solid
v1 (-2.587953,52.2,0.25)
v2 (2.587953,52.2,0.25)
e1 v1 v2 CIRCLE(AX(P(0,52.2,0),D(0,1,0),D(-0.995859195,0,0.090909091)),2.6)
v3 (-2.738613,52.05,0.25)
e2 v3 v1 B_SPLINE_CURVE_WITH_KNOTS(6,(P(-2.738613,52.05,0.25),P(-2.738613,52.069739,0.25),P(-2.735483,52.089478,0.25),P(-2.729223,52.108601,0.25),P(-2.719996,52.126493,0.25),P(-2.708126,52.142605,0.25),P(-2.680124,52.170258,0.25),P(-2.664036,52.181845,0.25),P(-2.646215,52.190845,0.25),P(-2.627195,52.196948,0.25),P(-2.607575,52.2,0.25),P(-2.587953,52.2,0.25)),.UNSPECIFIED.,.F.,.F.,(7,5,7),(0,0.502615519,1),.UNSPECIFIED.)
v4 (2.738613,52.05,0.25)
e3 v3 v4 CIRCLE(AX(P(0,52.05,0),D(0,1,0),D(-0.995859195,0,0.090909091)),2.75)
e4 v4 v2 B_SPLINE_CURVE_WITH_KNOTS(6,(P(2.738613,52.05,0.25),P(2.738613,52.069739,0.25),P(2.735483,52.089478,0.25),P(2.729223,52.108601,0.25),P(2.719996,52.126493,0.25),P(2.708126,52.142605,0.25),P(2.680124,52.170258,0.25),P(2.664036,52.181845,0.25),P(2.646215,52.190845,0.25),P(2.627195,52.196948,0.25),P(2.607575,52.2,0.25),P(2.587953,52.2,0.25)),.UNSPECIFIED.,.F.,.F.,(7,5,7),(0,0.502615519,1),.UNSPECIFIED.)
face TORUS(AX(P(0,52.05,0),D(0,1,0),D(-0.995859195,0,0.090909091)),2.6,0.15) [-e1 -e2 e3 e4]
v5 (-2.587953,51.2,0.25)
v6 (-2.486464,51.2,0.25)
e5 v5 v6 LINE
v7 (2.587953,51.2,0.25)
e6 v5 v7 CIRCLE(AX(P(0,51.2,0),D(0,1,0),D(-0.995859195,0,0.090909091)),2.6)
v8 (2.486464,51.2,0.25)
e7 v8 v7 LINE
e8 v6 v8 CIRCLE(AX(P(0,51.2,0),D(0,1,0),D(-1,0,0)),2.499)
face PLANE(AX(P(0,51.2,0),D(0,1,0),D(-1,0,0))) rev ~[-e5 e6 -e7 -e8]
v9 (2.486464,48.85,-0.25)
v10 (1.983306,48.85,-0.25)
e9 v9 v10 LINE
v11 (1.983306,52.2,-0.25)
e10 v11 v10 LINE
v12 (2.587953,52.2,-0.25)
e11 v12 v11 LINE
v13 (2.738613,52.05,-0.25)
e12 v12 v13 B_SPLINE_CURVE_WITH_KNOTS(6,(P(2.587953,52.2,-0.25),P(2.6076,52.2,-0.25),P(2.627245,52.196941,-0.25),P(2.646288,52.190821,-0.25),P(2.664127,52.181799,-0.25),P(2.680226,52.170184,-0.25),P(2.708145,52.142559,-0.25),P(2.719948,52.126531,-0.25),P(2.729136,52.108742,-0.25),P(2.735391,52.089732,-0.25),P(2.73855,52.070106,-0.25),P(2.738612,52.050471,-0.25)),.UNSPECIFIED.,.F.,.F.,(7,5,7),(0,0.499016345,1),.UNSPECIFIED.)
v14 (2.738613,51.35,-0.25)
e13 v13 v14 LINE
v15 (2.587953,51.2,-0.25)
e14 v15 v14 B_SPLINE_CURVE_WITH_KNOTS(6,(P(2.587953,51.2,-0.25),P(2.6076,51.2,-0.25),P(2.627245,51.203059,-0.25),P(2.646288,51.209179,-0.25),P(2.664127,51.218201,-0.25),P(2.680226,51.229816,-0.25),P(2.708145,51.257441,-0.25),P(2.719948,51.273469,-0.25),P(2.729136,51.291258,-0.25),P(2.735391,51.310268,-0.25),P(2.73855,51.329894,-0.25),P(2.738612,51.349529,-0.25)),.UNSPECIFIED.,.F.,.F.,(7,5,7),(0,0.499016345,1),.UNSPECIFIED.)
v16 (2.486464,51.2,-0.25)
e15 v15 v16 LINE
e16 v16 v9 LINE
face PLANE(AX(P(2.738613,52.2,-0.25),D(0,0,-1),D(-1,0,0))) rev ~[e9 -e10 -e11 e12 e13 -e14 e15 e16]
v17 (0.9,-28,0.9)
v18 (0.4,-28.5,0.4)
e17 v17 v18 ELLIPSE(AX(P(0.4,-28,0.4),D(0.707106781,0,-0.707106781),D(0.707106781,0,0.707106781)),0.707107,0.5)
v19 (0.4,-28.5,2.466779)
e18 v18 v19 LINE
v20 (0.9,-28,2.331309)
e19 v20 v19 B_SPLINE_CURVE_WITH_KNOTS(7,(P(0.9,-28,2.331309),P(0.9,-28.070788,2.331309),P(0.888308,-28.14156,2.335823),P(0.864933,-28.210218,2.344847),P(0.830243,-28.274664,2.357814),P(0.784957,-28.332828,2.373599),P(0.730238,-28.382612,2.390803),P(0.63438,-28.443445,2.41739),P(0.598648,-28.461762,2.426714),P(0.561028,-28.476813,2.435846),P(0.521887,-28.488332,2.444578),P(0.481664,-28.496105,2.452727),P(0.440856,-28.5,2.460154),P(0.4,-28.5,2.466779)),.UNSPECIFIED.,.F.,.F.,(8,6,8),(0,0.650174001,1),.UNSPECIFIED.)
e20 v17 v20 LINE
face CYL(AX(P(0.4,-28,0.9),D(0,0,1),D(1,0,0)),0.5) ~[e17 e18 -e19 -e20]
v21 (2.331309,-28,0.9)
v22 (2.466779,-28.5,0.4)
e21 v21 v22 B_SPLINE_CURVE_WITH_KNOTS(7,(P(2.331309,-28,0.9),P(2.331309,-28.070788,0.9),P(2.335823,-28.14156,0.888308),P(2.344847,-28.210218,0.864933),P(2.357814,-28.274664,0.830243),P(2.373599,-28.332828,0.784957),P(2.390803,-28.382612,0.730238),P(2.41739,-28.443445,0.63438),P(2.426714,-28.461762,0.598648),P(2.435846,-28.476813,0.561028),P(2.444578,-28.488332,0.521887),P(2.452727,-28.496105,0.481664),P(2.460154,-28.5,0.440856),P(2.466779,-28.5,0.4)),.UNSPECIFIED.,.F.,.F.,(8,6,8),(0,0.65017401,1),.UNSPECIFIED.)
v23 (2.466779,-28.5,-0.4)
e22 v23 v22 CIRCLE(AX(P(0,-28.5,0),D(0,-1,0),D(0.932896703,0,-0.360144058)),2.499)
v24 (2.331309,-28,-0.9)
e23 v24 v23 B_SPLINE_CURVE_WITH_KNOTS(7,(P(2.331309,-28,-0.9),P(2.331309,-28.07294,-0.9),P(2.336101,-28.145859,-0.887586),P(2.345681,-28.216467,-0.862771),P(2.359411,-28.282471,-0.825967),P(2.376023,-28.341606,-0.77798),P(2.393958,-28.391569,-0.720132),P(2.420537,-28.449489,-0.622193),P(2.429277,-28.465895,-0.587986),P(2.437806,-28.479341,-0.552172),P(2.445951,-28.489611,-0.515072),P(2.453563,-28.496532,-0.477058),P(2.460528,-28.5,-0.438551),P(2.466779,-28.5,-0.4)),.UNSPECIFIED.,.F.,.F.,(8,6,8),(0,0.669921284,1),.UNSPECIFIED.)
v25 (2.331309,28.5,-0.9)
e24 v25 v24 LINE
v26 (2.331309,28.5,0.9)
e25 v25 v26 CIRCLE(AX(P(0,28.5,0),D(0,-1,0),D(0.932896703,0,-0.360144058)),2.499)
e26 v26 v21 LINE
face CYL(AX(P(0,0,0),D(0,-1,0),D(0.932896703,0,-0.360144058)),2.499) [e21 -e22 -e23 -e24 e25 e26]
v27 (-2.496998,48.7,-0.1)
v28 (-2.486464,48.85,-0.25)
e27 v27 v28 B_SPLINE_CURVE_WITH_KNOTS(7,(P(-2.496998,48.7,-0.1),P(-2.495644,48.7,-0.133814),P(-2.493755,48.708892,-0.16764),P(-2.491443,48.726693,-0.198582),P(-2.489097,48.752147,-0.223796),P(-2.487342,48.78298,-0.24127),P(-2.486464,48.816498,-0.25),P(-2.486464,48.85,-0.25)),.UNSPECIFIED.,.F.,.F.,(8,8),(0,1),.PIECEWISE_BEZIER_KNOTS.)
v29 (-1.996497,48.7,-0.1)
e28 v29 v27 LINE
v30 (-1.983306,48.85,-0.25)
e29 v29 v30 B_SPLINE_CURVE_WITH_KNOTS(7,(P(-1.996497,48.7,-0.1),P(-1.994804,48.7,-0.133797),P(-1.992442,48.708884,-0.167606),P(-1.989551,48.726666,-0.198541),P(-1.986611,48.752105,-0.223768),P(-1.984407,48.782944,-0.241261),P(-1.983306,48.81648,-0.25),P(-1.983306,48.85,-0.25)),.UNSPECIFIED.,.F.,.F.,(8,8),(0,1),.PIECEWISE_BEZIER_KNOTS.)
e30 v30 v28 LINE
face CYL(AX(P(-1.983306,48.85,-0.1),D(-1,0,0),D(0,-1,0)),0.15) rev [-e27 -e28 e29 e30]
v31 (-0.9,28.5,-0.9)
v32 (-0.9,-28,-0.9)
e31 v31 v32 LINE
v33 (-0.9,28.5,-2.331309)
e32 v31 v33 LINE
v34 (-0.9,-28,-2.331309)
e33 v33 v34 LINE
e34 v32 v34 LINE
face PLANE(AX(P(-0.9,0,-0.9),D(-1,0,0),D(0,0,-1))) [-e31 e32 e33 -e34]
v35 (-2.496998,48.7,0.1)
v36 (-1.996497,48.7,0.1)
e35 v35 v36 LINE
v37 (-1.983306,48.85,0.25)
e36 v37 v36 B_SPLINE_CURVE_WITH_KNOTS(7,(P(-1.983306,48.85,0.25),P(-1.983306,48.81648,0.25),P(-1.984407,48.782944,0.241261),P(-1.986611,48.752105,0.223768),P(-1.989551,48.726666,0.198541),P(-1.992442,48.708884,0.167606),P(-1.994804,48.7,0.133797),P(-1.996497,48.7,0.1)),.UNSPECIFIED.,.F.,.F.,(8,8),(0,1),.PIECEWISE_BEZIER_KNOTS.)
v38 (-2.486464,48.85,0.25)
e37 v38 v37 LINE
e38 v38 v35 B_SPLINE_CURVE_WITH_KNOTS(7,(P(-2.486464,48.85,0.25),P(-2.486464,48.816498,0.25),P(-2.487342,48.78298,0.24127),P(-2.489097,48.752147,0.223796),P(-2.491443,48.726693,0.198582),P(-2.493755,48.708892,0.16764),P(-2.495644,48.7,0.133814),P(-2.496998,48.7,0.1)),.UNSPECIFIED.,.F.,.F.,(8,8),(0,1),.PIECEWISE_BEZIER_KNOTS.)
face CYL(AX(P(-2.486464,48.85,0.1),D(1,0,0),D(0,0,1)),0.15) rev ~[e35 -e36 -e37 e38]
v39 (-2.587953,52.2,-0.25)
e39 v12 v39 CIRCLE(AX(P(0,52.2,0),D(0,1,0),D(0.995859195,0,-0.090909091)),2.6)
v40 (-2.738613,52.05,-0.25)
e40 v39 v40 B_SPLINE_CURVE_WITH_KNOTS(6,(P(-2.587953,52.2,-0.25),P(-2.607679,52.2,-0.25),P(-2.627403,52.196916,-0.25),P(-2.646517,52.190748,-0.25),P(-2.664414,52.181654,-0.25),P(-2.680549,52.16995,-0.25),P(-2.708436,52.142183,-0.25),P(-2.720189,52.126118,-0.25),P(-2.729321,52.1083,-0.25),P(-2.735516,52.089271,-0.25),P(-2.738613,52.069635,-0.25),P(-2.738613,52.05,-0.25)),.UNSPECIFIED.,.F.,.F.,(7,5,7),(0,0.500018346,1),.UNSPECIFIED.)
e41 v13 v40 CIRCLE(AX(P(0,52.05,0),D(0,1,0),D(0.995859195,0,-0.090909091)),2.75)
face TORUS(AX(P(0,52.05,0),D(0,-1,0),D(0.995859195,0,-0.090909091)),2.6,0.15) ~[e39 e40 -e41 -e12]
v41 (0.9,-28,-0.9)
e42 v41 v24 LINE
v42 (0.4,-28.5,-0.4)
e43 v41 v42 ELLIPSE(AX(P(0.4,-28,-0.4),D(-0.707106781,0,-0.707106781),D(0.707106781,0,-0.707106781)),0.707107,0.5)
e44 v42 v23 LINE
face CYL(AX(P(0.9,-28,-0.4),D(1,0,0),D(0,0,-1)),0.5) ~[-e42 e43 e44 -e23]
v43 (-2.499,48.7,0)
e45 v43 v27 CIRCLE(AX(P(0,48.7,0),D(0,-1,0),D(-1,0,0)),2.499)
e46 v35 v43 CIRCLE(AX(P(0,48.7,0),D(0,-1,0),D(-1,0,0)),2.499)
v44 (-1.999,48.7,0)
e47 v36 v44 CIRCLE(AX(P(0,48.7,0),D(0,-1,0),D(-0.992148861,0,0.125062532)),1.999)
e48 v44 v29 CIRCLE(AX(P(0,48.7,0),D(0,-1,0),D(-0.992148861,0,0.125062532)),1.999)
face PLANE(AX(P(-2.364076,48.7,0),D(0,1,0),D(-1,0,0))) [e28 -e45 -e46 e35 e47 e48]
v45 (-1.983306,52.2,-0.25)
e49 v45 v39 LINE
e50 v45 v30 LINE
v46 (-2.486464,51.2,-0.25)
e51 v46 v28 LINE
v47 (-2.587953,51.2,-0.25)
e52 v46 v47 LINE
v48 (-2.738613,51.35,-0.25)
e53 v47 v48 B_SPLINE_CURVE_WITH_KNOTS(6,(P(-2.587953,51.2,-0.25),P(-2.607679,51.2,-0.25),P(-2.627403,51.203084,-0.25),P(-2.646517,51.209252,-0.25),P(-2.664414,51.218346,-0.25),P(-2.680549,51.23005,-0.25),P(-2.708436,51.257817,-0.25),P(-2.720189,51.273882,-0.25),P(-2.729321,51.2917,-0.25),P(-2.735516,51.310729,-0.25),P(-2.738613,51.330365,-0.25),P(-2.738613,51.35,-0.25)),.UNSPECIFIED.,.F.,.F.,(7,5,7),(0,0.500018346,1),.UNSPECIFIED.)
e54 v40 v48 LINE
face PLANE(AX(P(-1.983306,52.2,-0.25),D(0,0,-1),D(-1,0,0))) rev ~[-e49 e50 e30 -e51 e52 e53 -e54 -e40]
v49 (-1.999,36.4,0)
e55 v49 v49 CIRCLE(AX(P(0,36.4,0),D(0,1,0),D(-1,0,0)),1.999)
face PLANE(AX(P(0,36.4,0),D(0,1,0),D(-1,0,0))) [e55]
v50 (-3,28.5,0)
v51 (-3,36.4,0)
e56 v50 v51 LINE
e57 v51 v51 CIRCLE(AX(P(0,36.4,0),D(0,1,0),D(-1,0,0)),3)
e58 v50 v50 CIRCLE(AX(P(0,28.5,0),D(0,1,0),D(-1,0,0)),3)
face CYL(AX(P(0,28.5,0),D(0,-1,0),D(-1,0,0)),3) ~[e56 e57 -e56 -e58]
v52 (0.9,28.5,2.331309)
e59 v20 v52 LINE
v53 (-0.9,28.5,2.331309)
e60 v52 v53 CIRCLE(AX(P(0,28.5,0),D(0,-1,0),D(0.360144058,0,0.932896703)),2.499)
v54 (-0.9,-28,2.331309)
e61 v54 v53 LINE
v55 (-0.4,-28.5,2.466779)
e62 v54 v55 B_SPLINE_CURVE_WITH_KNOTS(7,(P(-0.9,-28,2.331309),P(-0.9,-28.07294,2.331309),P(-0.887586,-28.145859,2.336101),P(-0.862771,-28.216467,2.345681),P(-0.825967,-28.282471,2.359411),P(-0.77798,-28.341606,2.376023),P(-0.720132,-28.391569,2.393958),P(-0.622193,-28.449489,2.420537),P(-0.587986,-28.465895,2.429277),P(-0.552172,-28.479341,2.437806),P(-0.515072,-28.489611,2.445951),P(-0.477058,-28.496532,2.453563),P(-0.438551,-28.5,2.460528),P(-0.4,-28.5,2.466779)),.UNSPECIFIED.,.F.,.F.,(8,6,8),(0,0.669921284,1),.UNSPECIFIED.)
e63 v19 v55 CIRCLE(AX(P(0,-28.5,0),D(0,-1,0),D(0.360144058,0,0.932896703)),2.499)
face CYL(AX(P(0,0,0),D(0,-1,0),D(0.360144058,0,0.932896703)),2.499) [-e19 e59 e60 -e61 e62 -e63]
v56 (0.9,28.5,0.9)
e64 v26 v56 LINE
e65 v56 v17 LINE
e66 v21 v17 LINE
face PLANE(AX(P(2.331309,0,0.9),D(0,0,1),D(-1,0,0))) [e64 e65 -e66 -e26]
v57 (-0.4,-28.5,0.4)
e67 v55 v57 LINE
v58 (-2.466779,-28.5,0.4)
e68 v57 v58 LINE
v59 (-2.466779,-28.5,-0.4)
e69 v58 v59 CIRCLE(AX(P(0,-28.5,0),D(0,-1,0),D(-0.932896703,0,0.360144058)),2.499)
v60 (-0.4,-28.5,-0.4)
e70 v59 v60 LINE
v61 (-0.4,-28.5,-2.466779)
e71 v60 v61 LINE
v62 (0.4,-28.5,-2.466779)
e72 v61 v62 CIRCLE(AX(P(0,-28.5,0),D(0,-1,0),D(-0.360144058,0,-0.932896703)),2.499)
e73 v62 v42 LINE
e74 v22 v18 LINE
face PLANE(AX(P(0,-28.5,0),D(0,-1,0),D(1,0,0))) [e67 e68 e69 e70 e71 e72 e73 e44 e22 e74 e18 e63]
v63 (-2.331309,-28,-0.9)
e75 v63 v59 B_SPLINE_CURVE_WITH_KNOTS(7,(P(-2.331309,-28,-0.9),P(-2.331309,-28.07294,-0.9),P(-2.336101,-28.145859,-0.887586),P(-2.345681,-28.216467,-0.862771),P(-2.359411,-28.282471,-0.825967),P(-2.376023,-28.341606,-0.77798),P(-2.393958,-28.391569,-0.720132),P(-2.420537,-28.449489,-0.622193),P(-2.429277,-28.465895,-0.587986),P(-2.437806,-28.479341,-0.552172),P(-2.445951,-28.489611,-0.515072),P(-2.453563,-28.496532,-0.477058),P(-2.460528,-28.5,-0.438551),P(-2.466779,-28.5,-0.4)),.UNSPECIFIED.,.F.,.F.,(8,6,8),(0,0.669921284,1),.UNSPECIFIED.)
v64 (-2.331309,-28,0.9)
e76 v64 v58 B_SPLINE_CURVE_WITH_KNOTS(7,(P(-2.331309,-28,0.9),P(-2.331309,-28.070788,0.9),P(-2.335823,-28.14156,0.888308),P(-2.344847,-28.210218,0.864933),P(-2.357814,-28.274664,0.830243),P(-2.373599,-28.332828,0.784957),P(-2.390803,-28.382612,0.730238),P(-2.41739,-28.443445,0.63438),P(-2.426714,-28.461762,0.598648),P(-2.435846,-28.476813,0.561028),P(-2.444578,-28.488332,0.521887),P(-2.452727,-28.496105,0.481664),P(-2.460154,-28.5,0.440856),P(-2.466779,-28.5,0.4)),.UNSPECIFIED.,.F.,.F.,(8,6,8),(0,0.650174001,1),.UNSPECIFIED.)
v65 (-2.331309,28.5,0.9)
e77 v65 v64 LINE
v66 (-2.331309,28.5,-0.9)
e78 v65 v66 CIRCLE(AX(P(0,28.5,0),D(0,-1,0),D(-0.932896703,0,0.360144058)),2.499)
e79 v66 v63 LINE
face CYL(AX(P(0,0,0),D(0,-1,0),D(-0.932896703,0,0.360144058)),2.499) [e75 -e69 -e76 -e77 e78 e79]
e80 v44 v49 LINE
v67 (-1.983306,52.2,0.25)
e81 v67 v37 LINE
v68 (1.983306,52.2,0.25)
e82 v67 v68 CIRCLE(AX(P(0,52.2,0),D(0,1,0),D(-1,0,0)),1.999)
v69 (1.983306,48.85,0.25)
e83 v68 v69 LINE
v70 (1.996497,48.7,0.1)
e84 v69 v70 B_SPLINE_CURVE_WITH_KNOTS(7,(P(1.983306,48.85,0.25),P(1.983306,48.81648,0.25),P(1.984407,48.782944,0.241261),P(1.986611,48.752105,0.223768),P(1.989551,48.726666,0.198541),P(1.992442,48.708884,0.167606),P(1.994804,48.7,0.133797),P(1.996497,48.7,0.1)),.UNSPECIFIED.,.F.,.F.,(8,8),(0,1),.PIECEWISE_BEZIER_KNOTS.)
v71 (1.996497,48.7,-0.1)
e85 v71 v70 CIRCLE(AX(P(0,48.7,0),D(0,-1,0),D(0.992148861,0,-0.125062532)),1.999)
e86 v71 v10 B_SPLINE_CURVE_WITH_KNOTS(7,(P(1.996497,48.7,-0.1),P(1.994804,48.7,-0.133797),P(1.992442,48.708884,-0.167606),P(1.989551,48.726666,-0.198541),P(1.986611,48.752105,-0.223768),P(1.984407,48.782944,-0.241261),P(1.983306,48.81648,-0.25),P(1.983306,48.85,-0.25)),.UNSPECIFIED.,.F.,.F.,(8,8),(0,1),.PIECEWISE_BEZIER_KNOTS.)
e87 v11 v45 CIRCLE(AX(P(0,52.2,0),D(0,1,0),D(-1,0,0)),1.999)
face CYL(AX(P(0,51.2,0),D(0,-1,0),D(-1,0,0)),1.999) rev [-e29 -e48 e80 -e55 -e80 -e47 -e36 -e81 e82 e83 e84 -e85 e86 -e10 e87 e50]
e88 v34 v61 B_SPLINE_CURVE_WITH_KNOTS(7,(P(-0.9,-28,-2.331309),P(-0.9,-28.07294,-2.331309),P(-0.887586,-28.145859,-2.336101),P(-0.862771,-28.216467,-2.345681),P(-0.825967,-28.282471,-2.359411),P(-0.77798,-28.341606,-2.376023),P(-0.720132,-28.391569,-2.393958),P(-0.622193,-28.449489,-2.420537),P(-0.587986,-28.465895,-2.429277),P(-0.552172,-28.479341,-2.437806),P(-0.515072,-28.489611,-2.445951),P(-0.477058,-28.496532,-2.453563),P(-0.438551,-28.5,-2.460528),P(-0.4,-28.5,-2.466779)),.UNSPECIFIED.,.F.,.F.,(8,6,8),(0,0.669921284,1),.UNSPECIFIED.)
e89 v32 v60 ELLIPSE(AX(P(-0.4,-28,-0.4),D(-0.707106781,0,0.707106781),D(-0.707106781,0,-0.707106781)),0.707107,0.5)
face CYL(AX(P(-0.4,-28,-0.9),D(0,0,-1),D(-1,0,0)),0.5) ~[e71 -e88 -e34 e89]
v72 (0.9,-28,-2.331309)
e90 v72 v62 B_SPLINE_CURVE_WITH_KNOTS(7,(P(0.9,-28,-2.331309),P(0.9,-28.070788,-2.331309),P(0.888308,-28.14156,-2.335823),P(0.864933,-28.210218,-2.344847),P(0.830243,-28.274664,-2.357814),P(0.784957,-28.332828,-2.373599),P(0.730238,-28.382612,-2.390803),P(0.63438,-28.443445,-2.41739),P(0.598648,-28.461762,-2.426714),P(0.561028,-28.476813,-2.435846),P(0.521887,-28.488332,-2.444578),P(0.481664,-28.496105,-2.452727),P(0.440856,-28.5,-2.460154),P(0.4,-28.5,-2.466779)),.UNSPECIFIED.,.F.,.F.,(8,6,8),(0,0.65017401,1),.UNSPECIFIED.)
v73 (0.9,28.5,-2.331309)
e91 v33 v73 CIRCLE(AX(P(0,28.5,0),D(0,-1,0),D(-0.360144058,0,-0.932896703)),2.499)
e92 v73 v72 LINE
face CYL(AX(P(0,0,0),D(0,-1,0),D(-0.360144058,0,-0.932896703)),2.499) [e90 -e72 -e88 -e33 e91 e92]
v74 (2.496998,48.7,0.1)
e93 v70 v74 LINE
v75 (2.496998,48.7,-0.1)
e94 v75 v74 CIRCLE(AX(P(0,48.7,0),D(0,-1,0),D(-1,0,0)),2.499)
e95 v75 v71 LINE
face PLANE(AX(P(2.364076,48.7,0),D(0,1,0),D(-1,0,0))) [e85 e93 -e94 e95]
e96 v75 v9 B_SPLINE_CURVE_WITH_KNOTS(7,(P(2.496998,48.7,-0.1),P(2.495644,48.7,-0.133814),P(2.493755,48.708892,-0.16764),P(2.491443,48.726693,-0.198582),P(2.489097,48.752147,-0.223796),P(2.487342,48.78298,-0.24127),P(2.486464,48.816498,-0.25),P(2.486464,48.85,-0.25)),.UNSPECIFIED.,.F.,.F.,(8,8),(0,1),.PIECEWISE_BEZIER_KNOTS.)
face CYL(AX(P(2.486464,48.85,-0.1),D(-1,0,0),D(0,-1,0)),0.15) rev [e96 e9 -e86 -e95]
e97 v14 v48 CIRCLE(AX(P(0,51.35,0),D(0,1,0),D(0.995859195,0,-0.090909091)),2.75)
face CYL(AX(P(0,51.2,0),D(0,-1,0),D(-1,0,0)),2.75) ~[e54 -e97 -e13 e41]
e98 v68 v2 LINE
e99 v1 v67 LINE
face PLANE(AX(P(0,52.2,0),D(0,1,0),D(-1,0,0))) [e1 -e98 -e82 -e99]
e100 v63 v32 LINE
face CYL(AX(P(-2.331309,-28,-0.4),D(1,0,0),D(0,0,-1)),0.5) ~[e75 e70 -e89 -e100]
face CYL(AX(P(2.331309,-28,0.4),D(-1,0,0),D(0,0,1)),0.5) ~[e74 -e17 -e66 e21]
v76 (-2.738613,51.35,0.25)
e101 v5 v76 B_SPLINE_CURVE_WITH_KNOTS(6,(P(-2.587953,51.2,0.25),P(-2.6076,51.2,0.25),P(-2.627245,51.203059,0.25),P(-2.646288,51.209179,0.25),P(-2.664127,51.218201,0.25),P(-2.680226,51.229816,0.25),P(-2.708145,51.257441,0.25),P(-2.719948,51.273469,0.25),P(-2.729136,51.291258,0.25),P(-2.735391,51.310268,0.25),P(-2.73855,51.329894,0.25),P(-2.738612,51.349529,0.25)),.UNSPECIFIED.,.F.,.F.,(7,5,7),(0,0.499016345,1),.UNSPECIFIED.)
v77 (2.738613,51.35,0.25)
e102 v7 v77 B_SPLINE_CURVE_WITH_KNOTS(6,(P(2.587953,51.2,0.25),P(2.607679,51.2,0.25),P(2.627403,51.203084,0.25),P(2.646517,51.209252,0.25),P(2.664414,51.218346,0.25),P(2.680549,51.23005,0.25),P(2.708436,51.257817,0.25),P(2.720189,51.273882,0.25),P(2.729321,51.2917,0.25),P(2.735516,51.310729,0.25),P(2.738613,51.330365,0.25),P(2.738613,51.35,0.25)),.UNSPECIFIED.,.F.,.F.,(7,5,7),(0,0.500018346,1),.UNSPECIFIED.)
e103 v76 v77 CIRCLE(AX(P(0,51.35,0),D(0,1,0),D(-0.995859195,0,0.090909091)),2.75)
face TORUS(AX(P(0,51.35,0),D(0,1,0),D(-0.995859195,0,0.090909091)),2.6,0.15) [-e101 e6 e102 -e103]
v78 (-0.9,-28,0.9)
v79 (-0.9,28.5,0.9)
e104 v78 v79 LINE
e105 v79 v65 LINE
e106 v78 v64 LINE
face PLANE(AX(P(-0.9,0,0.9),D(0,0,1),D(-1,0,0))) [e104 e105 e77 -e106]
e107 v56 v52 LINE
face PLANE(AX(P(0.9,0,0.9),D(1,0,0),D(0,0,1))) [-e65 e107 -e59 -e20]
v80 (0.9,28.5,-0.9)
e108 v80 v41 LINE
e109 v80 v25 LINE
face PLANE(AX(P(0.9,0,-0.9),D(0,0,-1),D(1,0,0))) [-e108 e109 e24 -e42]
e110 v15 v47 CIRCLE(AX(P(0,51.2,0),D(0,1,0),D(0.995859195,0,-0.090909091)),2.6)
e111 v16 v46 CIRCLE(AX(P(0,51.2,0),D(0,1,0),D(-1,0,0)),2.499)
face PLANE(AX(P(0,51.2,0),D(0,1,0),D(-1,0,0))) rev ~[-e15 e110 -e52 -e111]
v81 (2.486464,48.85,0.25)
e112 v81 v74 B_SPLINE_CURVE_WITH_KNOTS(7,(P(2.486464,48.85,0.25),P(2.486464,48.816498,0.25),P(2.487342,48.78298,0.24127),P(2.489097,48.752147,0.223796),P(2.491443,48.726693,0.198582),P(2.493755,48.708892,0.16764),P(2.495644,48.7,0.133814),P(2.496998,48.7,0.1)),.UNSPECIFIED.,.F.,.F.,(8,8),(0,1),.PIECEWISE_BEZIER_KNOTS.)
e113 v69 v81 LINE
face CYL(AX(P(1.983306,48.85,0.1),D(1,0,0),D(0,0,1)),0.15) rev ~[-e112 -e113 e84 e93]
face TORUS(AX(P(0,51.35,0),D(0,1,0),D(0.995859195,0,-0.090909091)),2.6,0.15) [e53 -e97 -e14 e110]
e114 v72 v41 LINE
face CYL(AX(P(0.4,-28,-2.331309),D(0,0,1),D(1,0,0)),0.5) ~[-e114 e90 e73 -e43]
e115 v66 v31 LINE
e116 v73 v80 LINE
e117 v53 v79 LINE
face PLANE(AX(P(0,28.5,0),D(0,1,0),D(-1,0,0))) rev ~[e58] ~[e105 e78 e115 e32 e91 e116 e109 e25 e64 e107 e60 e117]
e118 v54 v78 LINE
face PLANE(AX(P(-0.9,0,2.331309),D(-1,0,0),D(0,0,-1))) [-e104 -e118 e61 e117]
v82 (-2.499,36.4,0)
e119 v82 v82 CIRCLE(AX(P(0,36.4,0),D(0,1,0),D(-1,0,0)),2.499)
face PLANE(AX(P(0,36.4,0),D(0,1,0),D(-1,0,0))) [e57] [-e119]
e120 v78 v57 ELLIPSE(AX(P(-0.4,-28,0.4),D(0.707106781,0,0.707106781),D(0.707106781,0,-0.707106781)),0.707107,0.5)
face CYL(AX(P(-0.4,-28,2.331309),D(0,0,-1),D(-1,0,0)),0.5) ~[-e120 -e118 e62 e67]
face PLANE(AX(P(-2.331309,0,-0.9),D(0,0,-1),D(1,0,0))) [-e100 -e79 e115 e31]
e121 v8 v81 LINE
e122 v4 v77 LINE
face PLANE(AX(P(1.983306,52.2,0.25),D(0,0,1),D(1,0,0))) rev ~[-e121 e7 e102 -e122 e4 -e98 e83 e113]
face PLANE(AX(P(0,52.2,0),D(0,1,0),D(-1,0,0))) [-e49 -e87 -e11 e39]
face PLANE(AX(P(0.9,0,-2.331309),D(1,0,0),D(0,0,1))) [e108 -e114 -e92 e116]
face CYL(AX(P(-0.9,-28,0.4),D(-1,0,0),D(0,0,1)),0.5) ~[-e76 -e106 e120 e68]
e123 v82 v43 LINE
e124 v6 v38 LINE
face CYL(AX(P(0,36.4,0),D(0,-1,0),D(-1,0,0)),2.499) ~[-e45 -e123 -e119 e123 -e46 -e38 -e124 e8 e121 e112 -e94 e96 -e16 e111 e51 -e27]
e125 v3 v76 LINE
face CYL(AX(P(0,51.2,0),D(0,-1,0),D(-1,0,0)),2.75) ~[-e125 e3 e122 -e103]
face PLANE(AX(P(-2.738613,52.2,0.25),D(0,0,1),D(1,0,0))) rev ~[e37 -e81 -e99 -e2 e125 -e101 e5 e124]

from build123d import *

# Parameters (mm, degrees)
F1_DEPTH  = 28.5
F2_R      = 0.5
F3_R      = 3
F4_DEPTH  = 7.9
F5_R      = 2.499
F5_R_2    = 1.999
F6_DEPTH  = 14.8
F7_R      = 2.75
F7_R_2    = 2.499
F7_R_3    = 1.999
F8_DEPTH  = 1
F10_DEPTH = 3.5
F11_R     = 0.15
F12_R     = 0.15


# Not quite as in the source:
# - a feature names something its author has since deleted; it is built from what else it names


with BuildPart() as f1:
    # F0 (on Front) → F1 (new body, symmetric)
    with BuildSketch(Plane.XZ):
        with BuildLine():
            Line((-0.9, 0.9), (-2.3313088598, 0.9))
            ThreePointArc((-2.3313088598, 0.9), (-2.499, 0), (-2.3313088598, -0.9))
            Line((-2.3313088598, -0.9), (-0.9, -0.9))
            Line((-0.9, -0.9), (-0.9, -2.3313088598))
            ThreePointArc((-0.9, -2.3313088598), (0, -2.499), (0.9, -2.3313088598))
            Line((0.9, -2.3313088598), (0.9, -0.9))
            Line((0.9, -0.9), (2.3313088598, -0.9))
            ThreePointArc((2.3313088598, -0.9), (2.499, 0), (2.3313088598, 0.9))
            Line((2.3313088598, 0.9), (0.9, 0.9))
            Line((0.9, 0.9), (0.9, 2.3313088598))
            ThreePointArc((0.9, 2.3313088598), (0, 2.499), (-0.9, 2.3313088598))
            Line((-0.9, 2.3313088598), (-0.9, 0.9))
        make_face()
    extrude(amount=F1_DEPTH, both=True)

    # F2
    f2_edges = [f1.edges().sort_by_distance(p)[0] for p in [
        (0.9, -28.5, 1.615654),
        (-0.9, -28.5, 1.615654),
        (1.615654, -28.5, 0.9),
        (1.615654, -28.5, -0.9),
        (0.9, -28.5, -1.615654),
        (-0.9, -28.5, -1.615654),
        (-1.615654, -28.5, -0.9),
        (-1.615654, -28.5, 0.9),
    ]]
    fillet(f2_edges, radius=F2_R)

    # F3 (on face) → F4 (join)
    with BuildSketch(Plane(origin=(0, 28.5, 0), x_dir=(-1, 0, 0), z_dir=(0, 1, 0))):
        Circle(F3_R)
        with BuildLine():
            Line((-2.3313088598, 0.9), (-0.9, 0.9))
            Line((-0.9, 0.9), (-0.9, 2.3313088598))
            ThreePointArc((-0.9, 2.3313088598), (0, 2.499), (0.9, 2.3313088598))
            Line((0.9, 2.3313088598), (0.9, 0.9))
            Line((0.9, 0.9), (2.3313088598, 0.9))
            ThreePointArc((2.3313088598, 0.9), (2.499, 0), (2.3313088598, -0.9))
            Line((2.3313088598, -0.9), (0.9, -0.9))
            Line((0.9, -0.9), (0.9, -2.3313088598))
            ThreePointArc((0.9, -2.3313088598), (0, -2.499), (-0.9, -2.3313088598))
            Line((-0.9, -2.3313088598), (-0.9, -0.9))
            Line((-0.9, -0.9), (-2.3313088598, -0.9))
            ThreePointArc((-2.3313088598, -0.9), (-2.499, 0), (-2.3313088598, 0.9))
        make_face(mode=Mode.SUBTRACT)
        with BuildLine():
            Line((-0.9, 2.3313088598), (-0.9, 0.9))
            Line((-0.9, 0.9), (-2.3313088598, 0.9))
            ThreePointArc((-2.3313088598, 0.9), (-2.499, 0), (-2.3313088598, -0.9))
            Line((-2.3313088598, -0.9), (-0.9, -0.9))
            Line((-0.9, -0.9), (-0.9, -2.3313088598))
            ThreePointArc((-0.9, -2.3313088598), (0, -2.499), (0.9, -2.3313088598))
            Line((0.9, -2.3313088598), (0.9, -0.9))
            Line((0.9, -0.9), (2.3313088598, -0.9))
            ThreePointArc((2.3313088598, -0.9), (2.499, 0), (2.3313088598, 0.9))
            Line((2.3313088598, 0.9), (0.9, 0.9))
            Line((0.9, 0.9), (0.9, 2.3313088598))
            ThreePointArc((0.9, 2.3313088598), (0, 2.499), (-0.9, 2.3313088598))
        make_face()
    extrude(amount=F4_DEPTH)

    # F5 (on face) → F6 (join)
    with BuildSketch(Plane(origin=(0, 36.4, 0), x_dir=(-1, 0, 0), z_dir=(0, 1, 0))):
        Circle(F5_R)
        Circle(F5_R_2, mode=Mode.SUBTRACT)
    extrude(amount=F6_DEPTH)

    # F7 (on face) → F8 (join)
    with BuildSketch(Plane(origin=(0, 51.2, 0), x_dir=(-1, 0, 0), z_dir=(0, 1, 0))):
        Circle(F7_R)
        Circle(F7_R_2, mode=Mode.SUBTRACT)
        Circle(F7_R_2)
        Circle(F7_R_3, mode=Mode.SUBTRACT)
    extrude(amount=F8_DEPTH)

    # F9 (on face) → F10 (cut)
    with BuildSketch(Plane(origin=(0, 52.2, 0), x_dir=(-1, 0, 0), z_dir=(0, 1, 0))):
        with BuildLine():
            ThreePointArc((-1.983305574, -0.25), (-1.999, 0), (-1.983305574, 0.25))
            Line((-1.983305574, 0.25), (-2.7386127875, 0.25))
            ThreePointArc((-2.7386127875, 0.25), (-2.75, 0), (-2.7386127875, -0.25))
            Line((-2.7386127875, -0.25), (-1.983305574, -0.25))
        make_face()
        with BuildLine():
            ThreePointArc((2.7386127875, -0.25), (2.75, 0), (2.7386127875, 0.25))
            Line((2.7386127875, 0.25), (1.983305574, 0.25))
            ThreePointArc((1.983305574, 0.25), (1.999, 0), (1.983305574, -0.25))
            Line((1.983305574, -0.25), (2.7386127875, -0.25))
        make_face()
    extrude(amount=-F10_DEPTH, mode=Mode.SUBTRACT)

    # F11
    f11_edges = [f1.edges().sort_by_distance(p)[0] for p in [
        (2.234885, 48.7, -0.25),
        (2.234885, 48.7, 0.25),
        (-2.234885, 48.7, -0.25),
        (-2.234885, 48.7, 0.25),
    ]]
    fillet(f11_edges, radius=F11_R)

    # F12
    f12_edges = [f1.edges().sort_by_distance(p)[0] for p in [
        (0, 52.2, 2.75),
        (0, 52.2, -2.75),
        (0, 51.2, -2.75),
        (0, 51.2, 2.75),
    ]]
    fillet(f12_edges, radius=F12_R)


solid = f1.part
